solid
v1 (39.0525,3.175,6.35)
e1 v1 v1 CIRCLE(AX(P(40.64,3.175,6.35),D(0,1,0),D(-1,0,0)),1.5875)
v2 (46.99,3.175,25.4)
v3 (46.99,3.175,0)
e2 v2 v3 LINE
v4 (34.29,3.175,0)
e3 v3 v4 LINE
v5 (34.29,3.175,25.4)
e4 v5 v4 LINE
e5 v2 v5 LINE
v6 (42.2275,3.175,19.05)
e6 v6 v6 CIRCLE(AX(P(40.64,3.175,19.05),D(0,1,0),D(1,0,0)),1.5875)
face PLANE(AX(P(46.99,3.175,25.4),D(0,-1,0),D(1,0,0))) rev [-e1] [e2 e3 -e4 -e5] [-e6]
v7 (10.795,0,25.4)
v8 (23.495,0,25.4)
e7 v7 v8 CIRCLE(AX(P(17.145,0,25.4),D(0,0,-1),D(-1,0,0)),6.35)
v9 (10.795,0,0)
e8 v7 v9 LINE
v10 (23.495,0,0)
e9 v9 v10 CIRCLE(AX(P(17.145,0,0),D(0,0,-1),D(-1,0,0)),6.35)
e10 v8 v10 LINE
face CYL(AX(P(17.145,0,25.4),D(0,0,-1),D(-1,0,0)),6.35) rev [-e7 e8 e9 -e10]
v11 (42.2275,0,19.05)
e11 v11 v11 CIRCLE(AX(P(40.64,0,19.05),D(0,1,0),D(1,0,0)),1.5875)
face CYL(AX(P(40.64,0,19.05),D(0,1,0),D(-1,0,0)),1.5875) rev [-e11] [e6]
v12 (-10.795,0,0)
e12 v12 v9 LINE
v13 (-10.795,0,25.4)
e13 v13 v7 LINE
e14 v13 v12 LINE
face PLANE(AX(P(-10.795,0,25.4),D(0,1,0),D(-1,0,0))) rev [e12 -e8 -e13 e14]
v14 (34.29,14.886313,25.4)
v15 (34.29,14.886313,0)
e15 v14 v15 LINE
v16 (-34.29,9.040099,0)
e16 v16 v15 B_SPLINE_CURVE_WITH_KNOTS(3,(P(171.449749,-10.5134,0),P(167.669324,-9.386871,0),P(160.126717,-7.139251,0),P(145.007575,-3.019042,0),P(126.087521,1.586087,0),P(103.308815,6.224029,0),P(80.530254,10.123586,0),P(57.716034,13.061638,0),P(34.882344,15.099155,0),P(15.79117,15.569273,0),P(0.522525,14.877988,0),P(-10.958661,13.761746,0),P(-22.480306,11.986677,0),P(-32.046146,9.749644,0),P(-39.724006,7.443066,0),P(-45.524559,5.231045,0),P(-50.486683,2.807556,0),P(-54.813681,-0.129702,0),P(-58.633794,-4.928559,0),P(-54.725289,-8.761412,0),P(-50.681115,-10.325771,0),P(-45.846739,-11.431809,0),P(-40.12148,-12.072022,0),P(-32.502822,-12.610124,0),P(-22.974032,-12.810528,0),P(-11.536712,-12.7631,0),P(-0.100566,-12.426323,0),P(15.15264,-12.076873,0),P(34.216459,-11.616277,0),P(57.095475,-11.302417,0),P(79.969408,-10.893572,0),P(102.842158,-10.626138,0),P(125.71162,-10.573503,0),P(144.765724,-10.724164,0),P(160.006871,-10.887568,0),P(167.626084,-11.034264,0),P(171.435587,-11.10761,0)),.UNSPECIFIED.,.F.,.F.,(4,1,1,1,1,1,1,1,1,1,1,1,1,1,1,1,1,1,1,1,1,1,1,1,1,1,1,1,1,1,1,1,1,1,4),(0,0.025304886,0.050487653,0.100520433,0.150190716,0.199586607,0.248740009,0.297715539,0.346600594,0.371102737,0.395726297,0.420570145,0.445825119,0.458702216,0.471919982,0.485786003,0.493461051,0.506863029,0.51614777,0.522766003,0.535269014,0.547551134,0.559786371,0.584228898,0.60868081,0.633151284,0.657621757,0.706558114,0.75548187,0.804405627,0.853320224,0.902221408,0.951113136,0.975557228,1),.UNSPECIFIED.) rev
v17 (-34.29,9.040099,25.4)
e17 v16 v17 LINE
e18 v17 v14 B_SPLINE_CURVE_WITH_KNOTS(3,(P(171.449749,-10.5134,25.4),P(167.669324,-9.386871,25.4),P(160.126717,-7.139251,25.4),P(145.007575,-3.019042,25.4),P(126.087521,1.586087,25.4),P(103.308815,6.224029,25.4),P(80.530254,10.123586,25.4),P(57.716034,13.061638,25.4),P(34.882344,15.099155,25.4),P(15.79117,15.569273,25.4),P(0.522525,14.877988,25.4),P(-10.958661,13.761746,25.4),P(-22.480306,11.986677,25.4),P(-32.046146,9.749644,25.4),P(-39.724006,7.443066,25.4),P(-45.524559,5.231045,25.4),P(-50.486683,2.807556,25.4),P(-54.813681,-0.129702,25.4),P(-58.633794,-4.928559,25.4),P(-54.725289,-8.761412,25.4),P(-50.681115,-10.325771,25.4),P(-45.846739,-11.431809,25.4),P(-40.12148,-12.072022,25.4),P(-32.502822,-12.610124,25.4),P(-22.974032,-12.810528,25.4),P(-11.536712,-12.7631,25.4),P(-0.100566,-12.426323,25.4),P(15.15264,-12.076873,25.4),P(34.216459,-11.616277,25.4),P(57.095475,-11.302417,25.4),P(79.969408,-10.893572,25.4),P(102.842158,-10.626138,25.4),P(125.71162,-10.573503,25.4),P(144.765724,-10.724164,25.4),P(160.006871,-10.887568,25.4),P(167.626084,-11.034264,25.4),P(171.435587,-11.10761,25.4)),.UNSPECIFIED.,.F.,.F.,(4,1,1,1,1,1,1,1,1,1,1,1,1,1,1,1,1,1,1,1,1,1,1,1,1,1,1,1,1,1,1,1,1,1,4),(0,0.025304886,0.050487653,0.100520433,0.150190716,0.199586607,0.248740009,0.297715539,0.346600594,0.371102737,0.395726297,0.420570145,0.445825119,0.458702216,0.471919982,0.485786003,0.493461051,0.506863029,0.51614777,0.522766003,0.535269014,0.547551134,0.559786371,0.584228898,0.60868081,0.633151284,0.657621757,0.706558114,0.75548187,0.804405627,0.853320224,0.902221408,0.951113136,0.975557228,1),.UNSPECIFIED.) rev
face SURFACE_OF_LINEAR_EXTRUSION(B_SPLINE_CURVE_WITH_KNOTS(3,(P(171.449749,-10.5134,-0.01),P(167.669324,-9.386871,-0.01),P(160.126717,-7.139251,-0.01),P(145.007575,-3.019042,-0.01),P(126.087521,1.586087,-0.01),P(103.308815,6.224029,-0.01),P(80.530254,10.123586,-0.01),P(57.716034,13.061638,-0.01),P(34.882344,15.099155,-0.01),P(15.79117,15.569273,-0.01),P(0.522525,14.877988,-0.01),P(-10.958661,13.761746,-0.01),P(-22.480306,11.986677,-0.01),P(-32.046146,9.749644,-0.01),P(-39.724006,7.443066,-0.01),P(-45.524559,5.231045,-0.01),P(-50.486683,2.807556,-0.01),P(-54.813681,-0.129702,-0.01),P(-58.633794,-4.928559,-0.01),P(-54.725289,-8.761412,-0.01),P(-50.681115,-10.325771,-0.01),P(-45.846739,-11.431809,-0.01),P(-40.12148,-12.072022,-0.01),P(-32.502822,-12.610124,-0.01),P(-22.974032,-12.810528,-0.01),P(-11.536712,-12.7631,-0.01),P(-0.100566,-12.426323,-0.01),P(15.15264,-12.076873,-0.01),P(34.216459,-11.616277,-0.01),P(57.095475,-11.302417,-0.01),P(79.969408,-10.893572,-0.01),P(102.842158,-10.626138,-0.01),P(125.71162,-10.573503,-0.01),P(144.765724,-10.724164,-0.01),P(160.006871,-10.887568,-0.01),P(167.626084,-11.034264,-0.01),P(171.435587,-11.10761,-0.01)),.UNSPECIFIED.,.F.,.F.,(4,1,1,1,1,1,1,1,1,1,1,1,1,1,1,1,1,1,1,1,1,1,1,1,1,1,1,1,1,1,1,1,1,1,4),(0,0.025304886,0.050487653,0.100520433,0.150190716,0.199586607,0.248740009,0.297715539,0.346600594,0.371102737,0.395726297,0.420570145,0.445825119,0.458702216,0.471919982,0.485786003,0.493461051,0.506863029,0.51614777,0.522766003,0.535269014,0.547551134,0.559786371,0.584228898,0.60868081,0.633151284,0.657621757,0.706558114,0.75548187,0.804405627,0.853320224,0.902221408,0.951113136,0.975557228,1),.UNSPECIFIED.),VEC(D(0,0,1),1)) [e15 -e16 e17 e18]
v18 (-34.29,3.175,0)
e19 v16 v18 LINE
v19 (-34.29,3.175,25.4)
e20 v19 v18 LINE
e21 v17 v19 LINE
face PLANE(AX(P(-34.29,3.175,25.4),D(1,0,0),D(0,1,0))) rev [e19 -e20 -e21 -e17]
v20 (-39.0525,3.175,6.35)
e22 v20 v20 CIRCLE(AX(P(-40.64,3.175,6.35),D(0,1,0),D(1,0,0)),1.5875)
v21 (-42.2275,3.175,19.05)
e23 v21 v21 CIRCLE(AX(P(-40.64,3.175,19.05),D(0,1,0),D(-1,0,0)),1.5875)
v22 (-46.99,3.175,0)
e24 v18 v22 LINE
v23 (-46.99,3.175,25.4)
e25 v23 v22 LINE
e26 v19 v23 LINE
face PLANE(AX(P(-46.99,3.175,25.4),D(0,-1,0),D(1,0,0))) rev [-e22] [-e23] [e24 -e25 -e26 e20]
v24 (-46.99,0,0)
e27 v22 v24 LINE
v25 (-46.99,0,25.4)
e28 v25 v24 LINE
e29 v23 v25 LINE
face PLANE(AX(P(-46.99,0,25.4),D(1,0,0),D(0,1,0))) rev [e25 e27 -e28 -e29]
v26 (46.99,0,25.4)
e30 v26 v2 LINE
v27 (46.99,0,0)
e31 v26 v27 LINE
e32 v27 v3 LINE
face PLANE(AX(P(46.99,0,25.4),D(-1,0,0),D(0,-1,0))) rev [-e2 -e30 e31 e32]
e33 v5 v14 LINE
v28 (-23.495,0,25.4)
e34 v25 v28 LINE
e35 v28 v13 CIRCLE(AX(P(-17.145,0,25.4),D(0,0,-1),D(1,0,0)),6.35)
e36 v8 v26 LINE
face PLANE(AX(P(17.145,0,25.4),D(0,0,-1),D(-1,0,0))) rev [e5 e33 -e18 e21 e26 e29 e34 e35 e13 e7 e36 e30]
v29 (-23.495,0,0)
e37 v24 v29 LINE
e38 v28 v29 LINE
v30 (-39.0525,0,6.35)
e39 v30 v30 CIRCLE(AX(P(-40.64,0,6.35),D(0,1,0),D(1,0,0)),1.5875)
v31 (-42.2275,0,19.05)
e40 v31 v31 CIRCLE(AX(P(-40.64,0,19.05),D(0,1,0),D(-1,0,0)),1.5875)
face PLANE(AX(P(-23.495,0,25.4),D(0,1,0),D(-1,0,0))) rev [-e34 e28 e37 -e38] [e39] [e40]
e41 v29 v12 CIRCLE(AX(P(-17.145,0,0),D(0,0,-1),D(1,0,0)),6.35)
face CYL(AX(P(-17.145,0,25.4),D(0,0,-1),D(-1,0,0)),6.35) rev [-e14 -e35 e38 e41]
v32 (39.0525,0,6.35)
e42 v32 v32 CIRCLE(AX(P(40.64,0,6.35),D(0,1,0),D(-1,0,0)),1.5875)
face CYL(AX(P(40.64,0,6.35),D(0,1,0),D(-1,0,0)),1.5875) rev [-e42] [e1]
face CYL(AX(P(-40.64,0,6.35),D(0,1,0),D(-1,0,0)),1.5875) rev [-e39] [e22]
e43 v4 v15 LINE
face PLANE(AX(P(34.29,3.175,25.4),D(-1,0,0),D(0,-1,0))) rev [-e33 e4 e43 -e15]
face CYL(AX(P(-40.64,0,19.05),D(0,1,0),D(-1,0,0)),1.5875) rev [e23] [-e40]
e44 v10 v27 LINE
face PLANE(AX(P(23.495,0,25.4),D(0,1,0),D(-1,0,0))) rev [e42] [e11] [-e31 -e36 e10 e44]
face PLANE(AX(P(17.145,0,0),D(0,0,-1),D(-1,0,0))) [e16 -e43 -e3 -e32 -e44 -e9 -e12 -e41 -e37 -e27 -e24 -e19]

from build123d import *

# Parameters (mm, degrees)
BOSS_EXTRUDE1_DEPTH = 25.4
SKETCH2_R           = 1.5875
CUT_EXTRUDE1_DEPTH  = 55.904554456
SPLIT1_DEPTH        = 25.4
SPLIT1_2_DEPTH      = 25.4


# Read off the part's stored shape, not the designer's step: Split1
with BuildPart() as part:
    # Sketch1 → Boss-Extrude1 (new body)
    with BuildSketch(Plane.XY):
        with BuildLine():
            Line((-10.795, 0), (10.795, 0))
            ThreePointArc((10.795, 0), (17.145, 6.35), (23.495, 0))
            Line((23.495, 0), (46.99, 0))
            Line((46.99, 0), (46.99, 3.175))
            Line((46.99, 3.175), (34.29, 3.175))
            Line((34.29, 3.175), (34.29, 15.875))
            Line((34.29, 15.875), (-34.29, 15.875))
            Line((-34.29, 15.875), (-34.29, 3.175))
            Line((-34.29, 3.175), (-46.99, 3.175))
            Line((-46.99, 3.175), (-46.99, 0))
            Line((-46.99, 0), (-23.495, 0))
            ThreePointArc((-23.495, 0), (-17.145, 6.35), (-10.795, 0))
        make_face()
    extrude(amount=BOSS_EXTRUDE1_DEPTH)

    # Sketch2 → Cut-Extrude1 (cut, through all)
    with BuildSketch(Plane(origin=(0, 3.175, 0), x_dir=(1, 0, 0), z_dir=(0, 1, 0))):
        with Locations(Location((40.64, -6.35, 0), (0, 0, 180))):
            Circle(SKETCH2_R)
        with Locations((40.64, -19.05)):
            Circle(SKETCH2_R)
        with Locations((-40.64, -6.35)):
            Circle(SKETCH2_R)
        with Locations(Location((-40.64, -19.05, 0), (0, 0, 180))):
            Circle(SKETCH2_R)
    extrude(amount=-CUT_EXTRUDE1_DEPTH, mode=Mode.SUBTRACT)

    # Split1 outline → Split1 (cut)
    with BuildSketch(Plane.XY):
        with BuildLine():
            add(Edge.make_bspline(
                [(34.29, 14.886313468), (26.866291946, 15.29633498), (15.604034158, 15.560800445), (0.522525145, 14.87798763), (-10.958660885, 13.761745583), (-22.480305747, 11.986676774), (-30.226096065, 10.175274204), (-34.155574129, 9.077862689), (-34.29, 9.040099193)],
                knots=[0.298916779, 0.298916779, 0.298916779, 0.298916779, 0.346600594, 0.371102737, 0.395726297, 0.420570145, 0.445825119, 0.446720069, 0.446720069, 0.446720069, 0.446720069], degree=3))
            Line((34.29, 14.886313468), (34.29, 15.875))
            Line((34.29, 15.875), (-34.29, 15.875))
            Line((-34.29, 15.875), (-34.29, 9.040099193))
        make_face()
    extrude(amount=SPLIT1_DEPTH, mode=Mode.SUBTRACT)


with BuildPart() as body_2:
    # Split1 2 outline → Split1 2 (new body)
    with BuildSketch(Plane.XY):
        with BuildLine():
            add(Edge.make_bspline(
                [(34.29, 14.886313468), (26.866291946, 15.29633498), (15.604034158, 15.560800445), (0.522525145, 14.87798763), (-10.958660885, 13.761745583), (-22.480305747, 11.986676774), (-30.226096065, 10.175274204), (-34.155574129, 9.077862689), (-34.29, 9.040099193)],
                knots=[0.298916779, 0.298916779, 0.298916779, 0.298916779, 0.346600594, 0.371102737, 0.395726297, 0.420570145, 0.445825119, 0.446720069, 0.446720069, 0.446720069, 0.446720069], degree=3))
            Line((34.29, 14.886313468), (34.29, 15.875))
            Line((34.29, 15.875), (-34.29, 15.875))
            Line((-34.29, 15.875), (-34.29, 9.040099193))
        make_face()
    extrude(amount=SPLIT1_2_DEPTH)


solid = part.part
